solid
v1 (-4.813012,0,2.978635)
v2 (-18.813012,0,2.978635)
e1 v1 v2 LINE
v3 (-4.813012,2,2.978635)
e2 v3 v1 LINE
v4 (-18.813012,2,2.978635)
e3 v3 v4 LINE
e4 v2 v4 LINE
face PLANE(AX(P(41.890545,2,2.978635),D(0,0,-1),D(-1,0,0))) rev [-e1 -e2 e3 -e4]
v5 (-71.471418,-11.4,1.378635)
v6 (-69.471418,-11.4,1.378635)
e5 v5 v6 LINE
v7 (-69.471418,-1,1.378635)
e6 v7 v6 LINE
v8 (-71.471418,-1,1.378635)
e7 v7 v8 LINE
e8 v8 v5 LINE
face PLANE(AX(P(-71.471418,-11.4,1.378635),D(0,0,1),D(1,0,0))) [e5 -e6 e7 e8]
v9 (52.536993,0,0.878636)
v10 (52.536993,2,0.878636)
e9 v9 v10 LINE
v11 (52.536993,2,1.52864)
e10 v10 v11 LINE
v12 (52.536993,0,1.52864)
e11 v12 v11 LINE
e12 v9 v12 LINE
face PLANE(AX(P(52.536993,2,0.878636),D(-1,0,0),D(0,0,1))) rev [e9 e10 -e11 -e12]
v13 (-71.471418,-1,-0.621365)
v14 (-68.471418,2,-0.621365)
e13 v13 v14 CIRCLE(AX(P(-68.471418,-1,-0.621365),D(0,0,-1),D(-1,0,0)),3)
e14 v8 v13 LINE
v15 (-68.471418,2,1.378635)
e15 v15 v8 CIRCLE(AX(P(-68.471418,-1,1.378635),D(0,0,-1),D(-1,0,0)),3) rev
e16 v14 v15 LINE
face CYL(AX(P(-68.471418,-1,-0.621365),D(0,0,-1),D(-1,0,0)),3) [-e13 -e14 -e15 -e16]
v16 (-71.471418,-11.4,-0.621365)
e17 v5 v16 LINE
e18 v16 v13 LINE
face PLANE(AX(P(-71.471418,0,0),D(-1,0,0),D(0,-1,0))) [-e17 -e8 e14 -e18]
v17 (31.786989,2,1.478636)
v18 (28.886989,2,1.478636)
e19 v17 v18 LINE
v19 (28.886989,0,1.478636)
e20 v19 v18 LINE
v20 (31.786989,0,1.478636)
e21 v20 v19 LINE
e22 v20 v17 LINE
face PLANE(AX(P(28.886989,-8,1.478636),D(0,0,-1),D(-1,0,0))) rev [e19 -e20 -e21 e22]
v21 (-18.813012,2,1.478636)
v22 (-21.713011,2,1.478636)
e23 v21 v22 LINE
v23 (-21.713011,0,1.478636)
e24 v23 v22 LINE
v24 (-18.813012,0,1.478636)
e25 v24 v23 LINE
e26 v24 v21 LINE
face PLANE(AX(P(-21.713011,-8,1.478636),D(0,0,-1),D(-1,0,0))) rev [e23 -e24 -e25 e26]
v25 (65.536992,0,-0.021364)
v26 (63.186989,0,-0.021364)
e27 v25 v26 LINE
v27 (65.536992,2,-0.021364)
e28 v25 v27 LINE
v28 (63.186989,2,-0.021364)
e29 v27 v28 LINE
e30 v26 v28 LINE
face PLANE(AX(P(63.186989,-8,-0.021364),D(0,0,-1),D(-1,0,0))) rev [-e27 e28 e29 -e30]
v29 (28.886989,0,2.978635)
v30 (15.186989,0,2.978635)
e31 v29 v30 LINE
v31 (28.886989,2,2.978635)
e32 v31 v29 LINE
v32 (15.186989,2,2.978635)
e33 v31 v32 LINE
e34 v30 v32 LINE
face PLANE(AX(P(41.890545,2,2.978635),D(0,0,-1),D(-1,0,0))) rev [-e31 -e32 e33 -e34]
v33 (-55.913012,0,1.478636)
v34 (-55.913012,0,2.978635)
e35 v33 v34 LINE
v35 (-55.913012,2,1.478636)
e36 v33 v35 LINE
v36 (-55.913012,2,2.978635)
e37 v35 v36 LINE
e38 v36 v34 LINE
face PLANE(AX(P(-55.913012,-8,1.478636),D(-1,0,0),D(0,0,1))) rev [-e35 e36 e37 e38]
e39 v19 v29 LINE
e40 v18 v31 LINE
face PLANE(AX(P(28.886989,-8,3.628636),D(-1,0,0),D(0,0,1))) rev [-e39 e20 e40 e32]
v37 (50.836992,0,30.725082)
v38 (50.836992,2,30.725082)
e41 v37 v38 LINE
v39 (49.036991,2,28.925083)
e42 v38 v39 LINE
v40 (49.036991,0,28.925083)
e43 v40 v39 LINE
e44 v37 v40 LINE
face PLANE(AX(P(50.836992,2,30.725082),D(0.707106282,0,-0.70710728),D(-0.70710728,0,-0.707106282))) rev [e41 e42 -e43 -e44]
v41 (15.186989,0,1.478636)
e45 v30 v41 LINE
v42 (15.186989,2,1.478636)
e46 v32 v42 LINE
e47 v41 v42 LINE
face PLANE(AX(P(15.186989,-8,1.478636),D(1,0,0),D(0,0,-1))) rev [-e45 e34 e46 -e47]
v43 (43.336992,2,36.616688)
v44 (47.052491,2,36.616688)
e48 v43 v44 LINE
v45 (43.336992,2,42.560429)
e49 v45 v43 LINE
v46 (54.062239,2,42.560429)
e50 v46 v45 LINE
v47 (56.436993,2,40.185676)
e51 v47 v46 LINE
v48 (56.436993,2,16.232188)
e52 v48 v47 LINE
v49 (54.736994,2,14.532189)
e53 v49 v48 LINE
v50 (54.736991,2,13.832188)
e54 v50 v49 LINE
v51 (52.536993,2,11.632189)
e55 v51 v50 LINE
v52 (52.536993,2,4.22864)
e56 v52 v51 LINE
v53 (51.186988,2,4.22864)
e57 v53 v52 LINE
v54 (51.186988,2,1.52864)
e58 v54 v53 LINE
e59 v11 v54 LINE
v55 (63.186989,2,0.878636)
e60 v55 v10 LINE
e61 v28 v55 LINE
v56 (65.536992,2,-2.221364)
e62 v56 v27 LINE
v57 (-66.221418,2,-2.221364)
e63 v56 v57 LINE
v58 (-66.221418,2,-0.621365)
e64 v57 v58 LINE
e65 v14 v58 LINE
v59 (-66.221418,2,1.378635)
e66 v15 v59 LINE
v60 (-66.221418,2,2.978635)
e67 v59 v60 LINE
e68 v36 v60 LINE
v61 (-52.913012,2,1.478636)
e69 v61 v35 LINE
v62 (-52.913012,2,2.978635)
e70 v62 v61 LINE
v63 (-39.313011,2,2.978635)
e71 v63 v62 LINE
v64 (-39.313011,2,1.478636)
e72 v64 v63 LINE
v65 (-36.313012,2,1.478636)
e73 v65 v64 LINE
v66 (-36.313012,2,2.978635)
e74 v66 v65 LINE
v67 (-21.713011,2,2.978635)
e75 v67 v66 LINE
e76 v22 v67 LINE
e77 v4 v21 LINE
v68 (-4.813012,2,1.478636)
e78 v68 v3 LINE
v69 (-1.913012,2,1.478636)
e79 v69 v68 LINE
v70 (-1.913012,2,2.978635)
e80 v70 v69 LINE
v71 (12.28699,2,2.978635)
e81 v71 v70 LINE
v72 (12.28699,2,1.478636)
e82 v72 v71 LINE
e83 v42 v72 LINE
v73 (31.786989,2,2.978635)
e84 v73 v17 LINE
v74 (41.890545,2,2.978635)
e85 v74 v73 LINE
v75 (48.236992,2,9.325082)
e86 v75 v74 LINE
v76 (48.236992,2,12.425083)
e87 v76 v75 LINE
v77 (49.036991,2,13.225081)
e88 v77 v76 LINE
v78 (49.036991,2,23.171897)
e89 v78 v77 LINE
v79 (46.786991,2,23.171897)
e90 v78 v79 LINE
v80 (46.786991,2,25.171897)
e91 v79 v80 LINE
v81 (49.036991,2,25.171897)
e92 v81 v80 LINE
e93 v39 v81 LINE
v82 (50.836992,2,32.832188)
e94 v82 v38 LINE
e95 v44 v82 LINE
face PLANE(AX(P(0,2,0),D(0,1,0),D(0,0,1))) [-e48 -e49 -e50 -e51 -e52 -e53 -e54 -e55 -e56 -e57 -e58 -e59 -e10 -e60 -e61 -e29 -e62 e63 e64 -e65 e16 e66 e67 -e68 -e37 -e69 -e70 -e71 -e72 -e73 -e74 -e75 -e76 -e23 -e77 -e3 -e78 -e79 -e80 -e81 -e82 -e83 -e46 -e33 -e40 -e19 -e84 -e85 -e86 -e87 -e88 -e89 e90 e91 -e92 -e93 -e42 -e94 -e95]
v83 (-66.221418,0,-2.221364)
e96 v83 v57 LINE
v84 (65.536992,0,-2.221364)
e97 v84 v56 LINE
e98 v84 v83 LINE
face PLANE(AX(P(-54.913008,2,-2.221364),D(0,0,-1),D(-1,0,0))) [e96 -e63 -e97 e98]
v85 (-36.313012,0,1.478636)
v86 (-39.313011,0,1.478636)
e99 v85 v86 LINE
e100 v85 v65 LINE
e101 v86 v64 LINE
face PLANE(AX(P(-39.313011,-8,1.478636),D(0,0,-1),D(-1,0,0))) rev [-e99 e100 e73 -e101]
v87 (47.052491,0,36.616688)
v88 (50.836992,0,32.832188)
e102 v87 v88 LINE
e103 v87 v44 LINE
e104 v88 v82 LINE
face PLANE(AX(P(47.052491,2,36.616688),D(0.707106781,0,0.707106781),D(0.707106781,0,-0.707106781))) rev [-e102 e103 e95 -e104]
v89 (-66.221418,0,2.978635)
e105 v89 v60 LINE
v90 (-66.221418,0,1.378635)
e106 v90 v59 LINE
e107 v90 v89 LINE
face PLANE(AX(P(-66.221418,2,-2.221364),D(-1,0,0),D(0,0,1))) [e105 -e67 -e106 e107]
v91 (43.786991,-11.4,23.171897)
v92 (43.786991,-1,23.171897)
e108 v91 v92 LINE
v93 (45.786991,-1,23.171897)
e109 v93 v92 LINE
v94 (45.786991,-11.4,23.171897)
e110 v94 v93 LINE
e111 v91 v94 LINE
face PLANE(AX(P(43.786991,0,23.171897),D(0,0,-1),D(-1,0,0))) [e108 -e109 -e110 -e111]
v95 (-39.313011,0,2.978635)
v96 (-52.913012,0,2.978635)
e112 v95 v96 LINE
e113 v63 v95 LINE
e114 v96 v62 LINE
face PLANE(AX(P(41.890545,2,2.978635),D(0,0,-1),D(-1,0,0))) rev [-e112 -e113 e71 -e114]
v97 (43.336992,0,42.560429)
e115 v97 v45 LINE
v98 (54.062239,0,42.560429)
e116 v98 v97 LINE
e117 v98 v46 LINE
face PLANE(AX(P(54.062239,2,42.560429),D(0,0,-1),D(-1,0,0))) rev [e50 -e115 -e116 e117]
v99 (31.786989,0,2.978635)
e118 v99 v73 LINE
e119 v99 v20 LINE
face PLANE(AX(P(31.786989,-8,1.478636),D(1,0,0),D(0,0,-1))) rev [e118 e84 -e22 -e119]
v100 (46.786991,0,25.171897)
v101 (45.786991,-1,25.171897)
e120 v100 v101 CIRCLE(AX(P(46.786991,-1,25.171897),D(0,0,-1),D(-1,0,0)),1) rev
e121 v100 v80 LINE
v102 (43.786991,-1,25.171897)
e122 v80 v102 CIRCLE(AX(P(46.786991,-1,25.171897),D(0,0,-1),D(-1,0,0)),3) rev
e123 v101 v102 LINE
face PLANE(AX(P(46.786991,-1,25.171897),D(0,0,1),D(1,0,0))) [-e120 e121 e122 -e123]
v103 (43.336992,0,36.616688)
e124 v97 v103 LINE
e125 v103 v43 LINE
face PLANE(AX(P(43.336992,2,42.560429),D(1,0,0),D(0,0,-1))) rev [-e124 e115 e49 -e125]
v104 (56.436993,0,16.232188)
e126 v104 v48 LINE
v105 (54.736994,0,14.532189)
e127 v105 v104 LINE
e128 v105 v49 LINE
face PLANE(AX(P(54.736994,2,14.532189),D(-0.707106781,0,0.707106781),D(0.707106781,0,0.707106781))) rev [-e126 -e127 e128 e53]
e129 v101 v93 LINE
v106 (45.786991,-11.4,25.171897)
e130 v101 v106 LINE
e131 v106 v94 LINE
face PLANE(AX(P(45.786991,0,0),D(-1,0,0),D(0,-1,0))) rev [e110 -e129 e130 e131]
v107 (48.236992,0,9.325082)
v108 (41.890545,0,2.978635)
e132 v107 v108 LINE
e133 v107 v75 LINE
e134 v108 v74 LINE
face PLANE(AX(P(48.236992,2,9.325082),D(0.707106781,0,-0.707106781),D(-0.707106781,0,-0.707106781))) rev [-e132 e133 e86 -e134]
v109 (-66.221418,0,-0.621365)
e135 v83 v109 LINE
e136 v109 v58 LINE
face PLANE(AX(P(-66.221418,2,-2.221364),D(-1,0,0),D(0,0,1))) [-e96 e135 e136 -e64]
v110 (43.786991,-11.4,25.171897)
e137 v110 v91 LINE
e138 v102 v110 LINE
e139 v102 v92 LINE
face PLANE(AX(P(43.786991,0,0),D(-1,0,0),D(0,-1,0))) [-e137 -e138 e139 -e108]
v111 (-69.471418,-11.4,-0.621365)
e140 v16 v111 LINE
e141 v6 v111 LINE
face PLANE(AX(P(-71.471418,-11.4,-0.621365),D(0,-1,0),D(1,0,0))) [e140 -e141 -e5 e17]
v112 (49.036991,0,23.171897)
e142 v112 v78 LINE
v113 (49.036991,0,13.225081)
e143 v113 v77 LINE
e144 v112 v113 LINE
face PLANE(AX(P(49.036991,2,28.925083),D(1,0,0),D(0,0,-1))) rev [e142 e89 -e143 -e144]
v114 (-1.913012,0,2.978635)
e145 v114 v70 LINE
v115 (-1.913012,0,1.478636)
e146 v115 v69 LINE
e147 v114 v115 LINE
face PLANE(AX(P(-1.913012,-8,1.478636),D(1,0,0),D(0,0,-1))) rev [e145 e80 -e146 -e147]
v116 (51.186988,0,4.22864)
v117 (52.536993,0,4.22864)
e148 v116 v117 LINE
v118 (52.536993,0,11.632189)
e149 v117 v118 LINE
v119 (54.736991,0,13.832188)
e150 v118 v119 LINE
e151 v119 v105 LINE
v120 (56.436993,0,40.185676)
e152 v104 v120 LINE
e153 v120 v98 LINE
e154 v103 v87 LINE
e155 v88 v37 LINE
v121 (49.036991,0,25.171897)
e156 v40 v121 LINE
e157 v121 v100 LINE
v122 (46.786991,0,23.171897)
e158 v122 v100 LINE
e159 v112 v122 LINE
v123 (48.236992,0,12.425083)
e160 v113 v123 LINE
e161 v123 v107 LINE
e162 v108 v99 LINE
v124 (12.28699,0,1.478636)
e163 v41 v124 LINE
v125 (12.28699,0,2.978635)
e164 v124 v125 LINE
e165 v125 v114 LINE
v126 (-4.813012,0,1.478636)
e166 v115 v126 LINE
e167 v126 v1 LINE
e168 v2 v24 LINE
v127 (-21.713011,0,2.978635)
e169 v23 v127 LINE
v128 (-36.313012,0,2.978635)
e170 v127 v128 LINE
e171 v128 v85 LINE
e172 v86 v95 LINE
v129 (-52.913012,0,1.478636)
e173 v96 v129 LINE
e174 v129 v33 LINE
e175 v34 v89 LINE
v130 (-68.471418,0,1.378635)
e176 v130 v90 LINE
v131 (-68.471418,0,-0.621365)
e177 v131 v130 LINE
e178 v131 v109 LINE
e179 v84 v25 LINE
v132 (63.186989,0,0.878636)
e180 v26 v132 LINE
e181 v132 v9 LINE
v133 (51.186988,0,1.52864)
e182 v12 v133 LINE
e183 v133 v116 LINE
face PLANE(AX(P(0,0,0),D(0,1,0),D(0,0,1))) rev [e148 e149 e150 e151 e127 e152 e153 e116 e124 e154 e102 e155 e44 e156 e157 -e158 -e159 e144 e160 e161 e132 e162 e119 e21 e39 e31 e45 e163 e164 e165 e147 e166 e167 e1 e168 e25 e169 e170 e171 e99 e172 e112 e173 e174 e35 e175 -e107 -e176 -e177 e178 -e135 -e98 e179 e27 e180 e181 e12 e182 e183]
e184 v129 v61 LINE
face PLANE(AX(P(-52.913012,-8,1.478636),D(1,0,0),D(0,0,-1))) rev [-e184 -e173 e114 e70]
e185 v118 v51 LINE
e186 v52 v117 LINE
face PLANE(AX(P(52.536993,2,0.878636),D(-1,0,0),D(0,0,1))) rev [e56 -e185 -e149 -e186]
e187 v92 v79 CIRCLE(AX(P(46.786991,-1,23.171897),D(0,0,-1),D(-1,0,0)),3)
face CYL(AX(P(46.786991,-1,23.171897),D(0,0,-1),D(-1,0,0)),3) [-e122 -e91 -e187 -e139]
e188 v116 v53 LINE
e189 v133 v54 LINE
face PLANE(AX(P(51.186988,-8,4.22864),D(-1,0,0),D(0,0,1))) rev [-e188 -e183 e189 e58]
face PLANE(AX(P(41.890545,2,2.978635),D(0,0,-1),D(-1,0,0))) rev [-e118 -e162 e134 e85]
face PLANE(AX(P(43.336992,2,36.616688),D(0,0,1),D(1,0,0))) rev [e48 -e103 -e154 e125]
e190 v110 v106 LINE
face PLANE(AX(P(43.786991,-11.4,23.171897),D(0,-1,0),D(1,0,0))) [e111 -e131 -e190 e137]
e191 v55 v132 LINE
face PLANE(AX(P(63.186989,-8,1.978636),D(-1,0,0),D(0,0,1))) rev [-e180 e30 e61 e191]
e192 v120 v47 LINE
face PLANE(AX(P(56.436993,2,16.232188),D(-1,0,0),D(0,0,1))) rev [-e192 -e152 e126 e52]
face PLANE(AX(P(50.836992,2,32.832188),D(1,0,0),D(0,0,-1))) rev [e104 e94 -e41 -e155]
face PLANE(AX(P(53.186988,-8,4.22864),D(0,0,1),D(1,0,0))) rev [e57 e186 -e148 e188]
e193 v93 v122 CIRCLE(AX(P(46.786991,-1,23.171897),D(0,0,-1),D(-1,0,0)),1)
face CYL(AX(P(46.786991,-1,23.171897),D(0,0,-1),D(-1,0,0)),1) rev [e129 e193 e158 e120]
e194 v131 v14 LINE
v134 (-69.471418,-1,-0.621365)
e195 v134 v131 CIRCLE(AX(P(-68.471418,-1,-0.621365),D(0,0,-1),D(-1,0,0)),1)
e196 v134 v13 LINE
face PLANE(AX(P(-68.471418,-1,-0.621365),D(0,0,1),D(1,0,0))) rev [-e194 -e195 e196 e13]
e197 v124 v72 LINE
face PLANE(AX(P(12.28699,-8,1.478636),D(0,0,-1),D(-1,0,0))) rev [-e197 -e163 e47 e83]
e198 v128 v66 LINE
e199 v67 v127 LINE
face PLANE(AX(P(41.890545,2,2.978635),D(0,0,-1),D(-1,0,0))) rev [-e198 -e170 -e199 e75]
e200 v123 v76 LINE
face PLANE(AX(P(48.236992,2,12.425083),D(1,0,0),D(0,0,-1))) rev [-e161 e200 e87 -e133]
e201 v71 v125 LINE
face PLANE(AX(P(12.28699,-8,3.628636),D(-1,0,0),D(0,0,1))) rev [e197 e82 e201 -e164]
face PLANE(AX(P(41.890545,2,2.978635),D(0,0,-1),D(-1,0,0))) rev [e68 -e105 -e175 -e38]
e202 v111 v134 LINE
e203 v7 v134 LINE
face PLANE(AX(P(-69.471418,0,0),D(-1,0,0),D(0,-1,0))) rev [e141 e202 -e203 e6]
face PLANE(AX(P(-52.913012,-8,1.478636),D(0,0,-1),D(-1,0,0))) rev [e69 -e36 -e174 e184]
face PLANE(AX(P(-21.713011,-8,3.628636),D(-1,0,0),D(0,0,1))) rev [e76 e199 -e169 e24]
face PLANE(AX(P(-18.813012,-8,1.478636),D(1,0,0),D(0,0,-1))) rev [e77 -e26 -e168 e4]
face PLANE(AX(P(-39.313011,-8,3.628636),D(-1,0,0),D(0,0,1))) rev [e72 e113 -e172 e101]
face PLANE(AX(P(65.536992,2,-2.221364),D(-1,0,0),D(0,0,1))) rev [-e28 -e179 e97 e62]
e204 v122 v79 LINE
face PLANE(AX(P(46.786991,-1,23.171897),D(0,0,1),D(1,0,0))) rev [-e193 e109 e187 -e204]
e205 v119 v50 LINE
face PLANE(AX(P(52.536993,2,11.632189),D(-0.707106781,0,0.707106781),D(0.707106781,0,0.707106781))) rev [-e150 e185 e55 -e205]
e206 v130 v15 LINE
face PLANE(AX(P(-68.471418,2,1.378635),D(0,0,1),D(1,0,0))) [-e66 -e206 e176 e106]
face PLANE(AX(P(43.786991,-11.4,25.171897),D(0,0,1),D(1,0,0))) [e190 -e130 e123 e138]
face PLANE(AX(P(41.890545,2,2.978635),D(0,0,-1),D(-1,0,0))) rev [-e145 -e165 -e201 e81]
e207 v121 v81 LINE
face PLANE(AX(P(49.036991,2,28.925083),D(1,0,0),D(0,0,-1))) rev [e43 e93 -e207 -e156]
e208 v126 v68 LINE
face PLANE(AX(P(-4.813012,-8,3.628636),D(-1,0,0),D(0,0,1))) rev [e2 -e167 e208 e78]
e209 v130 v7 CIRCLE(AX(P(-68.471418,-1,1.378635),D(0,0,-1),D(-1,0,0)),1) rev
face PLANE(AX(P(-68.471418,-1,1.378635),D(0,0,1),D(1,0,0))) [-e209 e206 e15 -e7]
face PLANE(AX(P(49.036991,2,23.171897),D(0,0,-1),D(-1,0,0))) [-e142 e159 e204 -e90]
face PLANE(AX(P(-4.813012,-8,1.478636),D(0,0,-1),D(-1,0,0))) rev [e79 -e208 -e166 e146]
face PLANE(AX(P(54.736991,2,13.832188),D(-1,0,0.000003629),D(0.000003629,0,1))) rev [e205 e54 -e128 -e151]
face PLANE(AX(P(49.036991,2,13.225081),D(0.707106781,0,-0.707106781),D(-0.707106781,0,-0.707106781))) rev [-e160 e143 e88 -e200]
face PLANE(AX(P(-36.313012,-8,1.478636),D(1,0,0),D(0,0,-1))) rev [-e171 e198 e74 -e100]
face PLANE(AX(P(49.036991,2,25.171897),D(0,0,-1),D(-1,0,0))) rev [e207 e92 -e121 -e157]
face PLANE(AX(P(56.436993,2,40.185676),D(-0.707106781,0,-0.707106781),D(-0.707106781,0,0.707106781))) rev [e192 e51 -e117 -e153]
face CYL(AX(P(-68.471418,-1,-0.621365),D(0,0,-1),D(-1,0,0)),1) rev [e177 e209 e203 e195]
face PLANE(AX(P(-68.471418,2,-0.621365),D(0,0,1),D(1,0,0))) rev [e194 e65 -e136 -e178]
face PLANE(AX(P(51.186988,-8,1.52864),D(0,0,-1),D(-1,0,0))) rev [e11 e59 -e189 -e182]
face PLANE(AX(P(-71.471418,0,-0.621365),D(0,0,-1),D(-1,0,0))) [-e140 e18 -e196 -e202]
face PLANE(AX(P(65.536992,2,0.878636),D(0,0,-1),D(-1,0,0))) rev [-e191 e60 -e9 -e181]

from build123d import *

# Parameters (mm, degrees)
SKETCH1_W           = 2.25
SKETCH1_H           = 2
BOSS_EXTRUDE1_DEPTH = 2
SKETCH12_W          = 3
SKETCH12_H          = 2.15
SKETCH12_W_2        = 2.99999908
SKETCH12_W_3        = 2.89999928
SKETCH12_W_4        = 2
SKETCH12_H_2        = 2.69999968
SKETCH12_H_3        = 2
CUT_EXTRUDE1_DEPTH  = 10
EDGE_FLANGE1_DEPTH  = 2
EDGE_FLANGE2_DEPTH  = 2


# Sheet-metal steps are written as plain solids
with BuildPart() as part:
    # Sketch1 → Boss-Extrude1 (new body)
    with BuildSketch(Plane(origin=(0, 0, 0), x_dir=(1, 0, 0), z_dir=(0, 1, 0))):
        with Locations((47.911990623, -24.171897133)):
            Rectangle(SKETCH1_W, SKETCH1_H)
        with Locations((-67.346417942, -0.378635375)):
            Rectangle(SKETCH1_W, SKETCH1_H)
        Polygon((49.036990623, -28.925083001), (49.036990623, -13.225081484), (48.236992223, -12.425083084), (48.236992223, -9.325081664), (41.890545314, -2.978634755), (-54.913007717, -2.978634755), (-66.221417942, -2.978634755), (-66.221417942, 2.221364005), (-54.913007717, 2.221364005), (65.536992183, 2.221364005), (65.536992183, -0.878636415), (52.536992783, -0.878636415), (52.536992783, -11.632189325), (54.736991299, -13.832187841), (54.736993839, -14.532188981), (56.436992603, -16.232187745), (56.436992603, -40.185676156), (54.062239478, -42.560429281), (43.336991863, -42.560429281), (43.336991863, -36.616688347), (47.052491322, -36.616688347), (50.836992103, -32.832187565), (50.836992103, -30.725081941), align=None)
    extrude(amount=BOSS_EXTRUDE1_DEPTH)

    # Sketch12 → Cut-Extrude1 (cut)
    with BuildSketch(Plane(origin=(0, 2, 0), x_dir=(1, 0, 0), z_dir=(0, 1, 0))):
        with Locations((-54.413012042, -2.553635995)):
            Rectangle(SKETCH12_W, SKETCH12_H)
        with Locations((-37.813011762, -2.553635995)):
            Rectangle(SKETCH12_W_2, SKETCH12_H)
        with Locations((-20.263011302, -2.553635995)):
            Rectangle(SKETCH12_W_3, SKETCH12_H)
        with Locations((-3.363012082, -2.553635995)):
            Rectangle(SKETCH12_W_3, SKETCH12_H)
        with Locations((13.736989278, -2.553635995)):
            Rectangle(SKETCH12_W_3, SKETCH12_H)
        with Locations((30.336989098, -2.553635995)):
            Rectangle(SKETCH12_W_3, SKETCH12_H)
        with Locations((52.186988038, -2.878639758)):
            Rectangle(SKETCH12_W_4, SKETCH12_H_2)
        with Locations((64.636989078, -0.978635995)):
            Rectangle(SKETCH12_W_3, SKETCH12_H_3)
    extrude(amount=-CUT_EXTRUDE1_DEPTH, mode=Mode.SUBTRACT)

    # Edge-Flange1 section (across the edge) → Edge-Flange1 (add)
    with BuildSketch(Plane(origin=(-69.471417942, 0, 1.378635375), x_dir=(1, 0, 0), z_dir=(0, 0, -1))):
        with BuildLine():
            Line((-2, 1), (-2, 11.4))
            Line((-2, 11.4), (0, 11.4))
            Line((0, 11.4), (0, 1))
            ThreePointArc((0, 1), (0.292893219, 0.292893219), (1, 0))
            Line((1, 0), (1, -2))
            ThreePointArc((1, -2), (-1.121320344, -1.121320344), (-2, 1))
        make_face()
    extrude(amount=EDGE_FLANGE1_DEPTH)

    # Edge-Flange2 section (across the edge) → Edge-Flange2 (add)
    with BuildSketch(Plane(origin=(45.786990623, 0, 25.171897133), x_dir=(1, 0, 0), z_dir=(0, 0, -1))):
        with BuildLine():
            Line((-2, 1), (-2, 11.4))
            Line((-2, 11.4), (0, 11.4))
            Line((0, 11.4), (0, 1))
            ThreePointArc((0, 1), (0.292893219, 0.292893219), (1, 0))
            Line((1, 0), (1, -2))
            ThreePointArc((1, -2), (-1.121320344, -1.121320344), (-2, 1))
        make_face()
    extrude(amount=EDGE_FLANGE2_DEPTH)


solid = part.part
